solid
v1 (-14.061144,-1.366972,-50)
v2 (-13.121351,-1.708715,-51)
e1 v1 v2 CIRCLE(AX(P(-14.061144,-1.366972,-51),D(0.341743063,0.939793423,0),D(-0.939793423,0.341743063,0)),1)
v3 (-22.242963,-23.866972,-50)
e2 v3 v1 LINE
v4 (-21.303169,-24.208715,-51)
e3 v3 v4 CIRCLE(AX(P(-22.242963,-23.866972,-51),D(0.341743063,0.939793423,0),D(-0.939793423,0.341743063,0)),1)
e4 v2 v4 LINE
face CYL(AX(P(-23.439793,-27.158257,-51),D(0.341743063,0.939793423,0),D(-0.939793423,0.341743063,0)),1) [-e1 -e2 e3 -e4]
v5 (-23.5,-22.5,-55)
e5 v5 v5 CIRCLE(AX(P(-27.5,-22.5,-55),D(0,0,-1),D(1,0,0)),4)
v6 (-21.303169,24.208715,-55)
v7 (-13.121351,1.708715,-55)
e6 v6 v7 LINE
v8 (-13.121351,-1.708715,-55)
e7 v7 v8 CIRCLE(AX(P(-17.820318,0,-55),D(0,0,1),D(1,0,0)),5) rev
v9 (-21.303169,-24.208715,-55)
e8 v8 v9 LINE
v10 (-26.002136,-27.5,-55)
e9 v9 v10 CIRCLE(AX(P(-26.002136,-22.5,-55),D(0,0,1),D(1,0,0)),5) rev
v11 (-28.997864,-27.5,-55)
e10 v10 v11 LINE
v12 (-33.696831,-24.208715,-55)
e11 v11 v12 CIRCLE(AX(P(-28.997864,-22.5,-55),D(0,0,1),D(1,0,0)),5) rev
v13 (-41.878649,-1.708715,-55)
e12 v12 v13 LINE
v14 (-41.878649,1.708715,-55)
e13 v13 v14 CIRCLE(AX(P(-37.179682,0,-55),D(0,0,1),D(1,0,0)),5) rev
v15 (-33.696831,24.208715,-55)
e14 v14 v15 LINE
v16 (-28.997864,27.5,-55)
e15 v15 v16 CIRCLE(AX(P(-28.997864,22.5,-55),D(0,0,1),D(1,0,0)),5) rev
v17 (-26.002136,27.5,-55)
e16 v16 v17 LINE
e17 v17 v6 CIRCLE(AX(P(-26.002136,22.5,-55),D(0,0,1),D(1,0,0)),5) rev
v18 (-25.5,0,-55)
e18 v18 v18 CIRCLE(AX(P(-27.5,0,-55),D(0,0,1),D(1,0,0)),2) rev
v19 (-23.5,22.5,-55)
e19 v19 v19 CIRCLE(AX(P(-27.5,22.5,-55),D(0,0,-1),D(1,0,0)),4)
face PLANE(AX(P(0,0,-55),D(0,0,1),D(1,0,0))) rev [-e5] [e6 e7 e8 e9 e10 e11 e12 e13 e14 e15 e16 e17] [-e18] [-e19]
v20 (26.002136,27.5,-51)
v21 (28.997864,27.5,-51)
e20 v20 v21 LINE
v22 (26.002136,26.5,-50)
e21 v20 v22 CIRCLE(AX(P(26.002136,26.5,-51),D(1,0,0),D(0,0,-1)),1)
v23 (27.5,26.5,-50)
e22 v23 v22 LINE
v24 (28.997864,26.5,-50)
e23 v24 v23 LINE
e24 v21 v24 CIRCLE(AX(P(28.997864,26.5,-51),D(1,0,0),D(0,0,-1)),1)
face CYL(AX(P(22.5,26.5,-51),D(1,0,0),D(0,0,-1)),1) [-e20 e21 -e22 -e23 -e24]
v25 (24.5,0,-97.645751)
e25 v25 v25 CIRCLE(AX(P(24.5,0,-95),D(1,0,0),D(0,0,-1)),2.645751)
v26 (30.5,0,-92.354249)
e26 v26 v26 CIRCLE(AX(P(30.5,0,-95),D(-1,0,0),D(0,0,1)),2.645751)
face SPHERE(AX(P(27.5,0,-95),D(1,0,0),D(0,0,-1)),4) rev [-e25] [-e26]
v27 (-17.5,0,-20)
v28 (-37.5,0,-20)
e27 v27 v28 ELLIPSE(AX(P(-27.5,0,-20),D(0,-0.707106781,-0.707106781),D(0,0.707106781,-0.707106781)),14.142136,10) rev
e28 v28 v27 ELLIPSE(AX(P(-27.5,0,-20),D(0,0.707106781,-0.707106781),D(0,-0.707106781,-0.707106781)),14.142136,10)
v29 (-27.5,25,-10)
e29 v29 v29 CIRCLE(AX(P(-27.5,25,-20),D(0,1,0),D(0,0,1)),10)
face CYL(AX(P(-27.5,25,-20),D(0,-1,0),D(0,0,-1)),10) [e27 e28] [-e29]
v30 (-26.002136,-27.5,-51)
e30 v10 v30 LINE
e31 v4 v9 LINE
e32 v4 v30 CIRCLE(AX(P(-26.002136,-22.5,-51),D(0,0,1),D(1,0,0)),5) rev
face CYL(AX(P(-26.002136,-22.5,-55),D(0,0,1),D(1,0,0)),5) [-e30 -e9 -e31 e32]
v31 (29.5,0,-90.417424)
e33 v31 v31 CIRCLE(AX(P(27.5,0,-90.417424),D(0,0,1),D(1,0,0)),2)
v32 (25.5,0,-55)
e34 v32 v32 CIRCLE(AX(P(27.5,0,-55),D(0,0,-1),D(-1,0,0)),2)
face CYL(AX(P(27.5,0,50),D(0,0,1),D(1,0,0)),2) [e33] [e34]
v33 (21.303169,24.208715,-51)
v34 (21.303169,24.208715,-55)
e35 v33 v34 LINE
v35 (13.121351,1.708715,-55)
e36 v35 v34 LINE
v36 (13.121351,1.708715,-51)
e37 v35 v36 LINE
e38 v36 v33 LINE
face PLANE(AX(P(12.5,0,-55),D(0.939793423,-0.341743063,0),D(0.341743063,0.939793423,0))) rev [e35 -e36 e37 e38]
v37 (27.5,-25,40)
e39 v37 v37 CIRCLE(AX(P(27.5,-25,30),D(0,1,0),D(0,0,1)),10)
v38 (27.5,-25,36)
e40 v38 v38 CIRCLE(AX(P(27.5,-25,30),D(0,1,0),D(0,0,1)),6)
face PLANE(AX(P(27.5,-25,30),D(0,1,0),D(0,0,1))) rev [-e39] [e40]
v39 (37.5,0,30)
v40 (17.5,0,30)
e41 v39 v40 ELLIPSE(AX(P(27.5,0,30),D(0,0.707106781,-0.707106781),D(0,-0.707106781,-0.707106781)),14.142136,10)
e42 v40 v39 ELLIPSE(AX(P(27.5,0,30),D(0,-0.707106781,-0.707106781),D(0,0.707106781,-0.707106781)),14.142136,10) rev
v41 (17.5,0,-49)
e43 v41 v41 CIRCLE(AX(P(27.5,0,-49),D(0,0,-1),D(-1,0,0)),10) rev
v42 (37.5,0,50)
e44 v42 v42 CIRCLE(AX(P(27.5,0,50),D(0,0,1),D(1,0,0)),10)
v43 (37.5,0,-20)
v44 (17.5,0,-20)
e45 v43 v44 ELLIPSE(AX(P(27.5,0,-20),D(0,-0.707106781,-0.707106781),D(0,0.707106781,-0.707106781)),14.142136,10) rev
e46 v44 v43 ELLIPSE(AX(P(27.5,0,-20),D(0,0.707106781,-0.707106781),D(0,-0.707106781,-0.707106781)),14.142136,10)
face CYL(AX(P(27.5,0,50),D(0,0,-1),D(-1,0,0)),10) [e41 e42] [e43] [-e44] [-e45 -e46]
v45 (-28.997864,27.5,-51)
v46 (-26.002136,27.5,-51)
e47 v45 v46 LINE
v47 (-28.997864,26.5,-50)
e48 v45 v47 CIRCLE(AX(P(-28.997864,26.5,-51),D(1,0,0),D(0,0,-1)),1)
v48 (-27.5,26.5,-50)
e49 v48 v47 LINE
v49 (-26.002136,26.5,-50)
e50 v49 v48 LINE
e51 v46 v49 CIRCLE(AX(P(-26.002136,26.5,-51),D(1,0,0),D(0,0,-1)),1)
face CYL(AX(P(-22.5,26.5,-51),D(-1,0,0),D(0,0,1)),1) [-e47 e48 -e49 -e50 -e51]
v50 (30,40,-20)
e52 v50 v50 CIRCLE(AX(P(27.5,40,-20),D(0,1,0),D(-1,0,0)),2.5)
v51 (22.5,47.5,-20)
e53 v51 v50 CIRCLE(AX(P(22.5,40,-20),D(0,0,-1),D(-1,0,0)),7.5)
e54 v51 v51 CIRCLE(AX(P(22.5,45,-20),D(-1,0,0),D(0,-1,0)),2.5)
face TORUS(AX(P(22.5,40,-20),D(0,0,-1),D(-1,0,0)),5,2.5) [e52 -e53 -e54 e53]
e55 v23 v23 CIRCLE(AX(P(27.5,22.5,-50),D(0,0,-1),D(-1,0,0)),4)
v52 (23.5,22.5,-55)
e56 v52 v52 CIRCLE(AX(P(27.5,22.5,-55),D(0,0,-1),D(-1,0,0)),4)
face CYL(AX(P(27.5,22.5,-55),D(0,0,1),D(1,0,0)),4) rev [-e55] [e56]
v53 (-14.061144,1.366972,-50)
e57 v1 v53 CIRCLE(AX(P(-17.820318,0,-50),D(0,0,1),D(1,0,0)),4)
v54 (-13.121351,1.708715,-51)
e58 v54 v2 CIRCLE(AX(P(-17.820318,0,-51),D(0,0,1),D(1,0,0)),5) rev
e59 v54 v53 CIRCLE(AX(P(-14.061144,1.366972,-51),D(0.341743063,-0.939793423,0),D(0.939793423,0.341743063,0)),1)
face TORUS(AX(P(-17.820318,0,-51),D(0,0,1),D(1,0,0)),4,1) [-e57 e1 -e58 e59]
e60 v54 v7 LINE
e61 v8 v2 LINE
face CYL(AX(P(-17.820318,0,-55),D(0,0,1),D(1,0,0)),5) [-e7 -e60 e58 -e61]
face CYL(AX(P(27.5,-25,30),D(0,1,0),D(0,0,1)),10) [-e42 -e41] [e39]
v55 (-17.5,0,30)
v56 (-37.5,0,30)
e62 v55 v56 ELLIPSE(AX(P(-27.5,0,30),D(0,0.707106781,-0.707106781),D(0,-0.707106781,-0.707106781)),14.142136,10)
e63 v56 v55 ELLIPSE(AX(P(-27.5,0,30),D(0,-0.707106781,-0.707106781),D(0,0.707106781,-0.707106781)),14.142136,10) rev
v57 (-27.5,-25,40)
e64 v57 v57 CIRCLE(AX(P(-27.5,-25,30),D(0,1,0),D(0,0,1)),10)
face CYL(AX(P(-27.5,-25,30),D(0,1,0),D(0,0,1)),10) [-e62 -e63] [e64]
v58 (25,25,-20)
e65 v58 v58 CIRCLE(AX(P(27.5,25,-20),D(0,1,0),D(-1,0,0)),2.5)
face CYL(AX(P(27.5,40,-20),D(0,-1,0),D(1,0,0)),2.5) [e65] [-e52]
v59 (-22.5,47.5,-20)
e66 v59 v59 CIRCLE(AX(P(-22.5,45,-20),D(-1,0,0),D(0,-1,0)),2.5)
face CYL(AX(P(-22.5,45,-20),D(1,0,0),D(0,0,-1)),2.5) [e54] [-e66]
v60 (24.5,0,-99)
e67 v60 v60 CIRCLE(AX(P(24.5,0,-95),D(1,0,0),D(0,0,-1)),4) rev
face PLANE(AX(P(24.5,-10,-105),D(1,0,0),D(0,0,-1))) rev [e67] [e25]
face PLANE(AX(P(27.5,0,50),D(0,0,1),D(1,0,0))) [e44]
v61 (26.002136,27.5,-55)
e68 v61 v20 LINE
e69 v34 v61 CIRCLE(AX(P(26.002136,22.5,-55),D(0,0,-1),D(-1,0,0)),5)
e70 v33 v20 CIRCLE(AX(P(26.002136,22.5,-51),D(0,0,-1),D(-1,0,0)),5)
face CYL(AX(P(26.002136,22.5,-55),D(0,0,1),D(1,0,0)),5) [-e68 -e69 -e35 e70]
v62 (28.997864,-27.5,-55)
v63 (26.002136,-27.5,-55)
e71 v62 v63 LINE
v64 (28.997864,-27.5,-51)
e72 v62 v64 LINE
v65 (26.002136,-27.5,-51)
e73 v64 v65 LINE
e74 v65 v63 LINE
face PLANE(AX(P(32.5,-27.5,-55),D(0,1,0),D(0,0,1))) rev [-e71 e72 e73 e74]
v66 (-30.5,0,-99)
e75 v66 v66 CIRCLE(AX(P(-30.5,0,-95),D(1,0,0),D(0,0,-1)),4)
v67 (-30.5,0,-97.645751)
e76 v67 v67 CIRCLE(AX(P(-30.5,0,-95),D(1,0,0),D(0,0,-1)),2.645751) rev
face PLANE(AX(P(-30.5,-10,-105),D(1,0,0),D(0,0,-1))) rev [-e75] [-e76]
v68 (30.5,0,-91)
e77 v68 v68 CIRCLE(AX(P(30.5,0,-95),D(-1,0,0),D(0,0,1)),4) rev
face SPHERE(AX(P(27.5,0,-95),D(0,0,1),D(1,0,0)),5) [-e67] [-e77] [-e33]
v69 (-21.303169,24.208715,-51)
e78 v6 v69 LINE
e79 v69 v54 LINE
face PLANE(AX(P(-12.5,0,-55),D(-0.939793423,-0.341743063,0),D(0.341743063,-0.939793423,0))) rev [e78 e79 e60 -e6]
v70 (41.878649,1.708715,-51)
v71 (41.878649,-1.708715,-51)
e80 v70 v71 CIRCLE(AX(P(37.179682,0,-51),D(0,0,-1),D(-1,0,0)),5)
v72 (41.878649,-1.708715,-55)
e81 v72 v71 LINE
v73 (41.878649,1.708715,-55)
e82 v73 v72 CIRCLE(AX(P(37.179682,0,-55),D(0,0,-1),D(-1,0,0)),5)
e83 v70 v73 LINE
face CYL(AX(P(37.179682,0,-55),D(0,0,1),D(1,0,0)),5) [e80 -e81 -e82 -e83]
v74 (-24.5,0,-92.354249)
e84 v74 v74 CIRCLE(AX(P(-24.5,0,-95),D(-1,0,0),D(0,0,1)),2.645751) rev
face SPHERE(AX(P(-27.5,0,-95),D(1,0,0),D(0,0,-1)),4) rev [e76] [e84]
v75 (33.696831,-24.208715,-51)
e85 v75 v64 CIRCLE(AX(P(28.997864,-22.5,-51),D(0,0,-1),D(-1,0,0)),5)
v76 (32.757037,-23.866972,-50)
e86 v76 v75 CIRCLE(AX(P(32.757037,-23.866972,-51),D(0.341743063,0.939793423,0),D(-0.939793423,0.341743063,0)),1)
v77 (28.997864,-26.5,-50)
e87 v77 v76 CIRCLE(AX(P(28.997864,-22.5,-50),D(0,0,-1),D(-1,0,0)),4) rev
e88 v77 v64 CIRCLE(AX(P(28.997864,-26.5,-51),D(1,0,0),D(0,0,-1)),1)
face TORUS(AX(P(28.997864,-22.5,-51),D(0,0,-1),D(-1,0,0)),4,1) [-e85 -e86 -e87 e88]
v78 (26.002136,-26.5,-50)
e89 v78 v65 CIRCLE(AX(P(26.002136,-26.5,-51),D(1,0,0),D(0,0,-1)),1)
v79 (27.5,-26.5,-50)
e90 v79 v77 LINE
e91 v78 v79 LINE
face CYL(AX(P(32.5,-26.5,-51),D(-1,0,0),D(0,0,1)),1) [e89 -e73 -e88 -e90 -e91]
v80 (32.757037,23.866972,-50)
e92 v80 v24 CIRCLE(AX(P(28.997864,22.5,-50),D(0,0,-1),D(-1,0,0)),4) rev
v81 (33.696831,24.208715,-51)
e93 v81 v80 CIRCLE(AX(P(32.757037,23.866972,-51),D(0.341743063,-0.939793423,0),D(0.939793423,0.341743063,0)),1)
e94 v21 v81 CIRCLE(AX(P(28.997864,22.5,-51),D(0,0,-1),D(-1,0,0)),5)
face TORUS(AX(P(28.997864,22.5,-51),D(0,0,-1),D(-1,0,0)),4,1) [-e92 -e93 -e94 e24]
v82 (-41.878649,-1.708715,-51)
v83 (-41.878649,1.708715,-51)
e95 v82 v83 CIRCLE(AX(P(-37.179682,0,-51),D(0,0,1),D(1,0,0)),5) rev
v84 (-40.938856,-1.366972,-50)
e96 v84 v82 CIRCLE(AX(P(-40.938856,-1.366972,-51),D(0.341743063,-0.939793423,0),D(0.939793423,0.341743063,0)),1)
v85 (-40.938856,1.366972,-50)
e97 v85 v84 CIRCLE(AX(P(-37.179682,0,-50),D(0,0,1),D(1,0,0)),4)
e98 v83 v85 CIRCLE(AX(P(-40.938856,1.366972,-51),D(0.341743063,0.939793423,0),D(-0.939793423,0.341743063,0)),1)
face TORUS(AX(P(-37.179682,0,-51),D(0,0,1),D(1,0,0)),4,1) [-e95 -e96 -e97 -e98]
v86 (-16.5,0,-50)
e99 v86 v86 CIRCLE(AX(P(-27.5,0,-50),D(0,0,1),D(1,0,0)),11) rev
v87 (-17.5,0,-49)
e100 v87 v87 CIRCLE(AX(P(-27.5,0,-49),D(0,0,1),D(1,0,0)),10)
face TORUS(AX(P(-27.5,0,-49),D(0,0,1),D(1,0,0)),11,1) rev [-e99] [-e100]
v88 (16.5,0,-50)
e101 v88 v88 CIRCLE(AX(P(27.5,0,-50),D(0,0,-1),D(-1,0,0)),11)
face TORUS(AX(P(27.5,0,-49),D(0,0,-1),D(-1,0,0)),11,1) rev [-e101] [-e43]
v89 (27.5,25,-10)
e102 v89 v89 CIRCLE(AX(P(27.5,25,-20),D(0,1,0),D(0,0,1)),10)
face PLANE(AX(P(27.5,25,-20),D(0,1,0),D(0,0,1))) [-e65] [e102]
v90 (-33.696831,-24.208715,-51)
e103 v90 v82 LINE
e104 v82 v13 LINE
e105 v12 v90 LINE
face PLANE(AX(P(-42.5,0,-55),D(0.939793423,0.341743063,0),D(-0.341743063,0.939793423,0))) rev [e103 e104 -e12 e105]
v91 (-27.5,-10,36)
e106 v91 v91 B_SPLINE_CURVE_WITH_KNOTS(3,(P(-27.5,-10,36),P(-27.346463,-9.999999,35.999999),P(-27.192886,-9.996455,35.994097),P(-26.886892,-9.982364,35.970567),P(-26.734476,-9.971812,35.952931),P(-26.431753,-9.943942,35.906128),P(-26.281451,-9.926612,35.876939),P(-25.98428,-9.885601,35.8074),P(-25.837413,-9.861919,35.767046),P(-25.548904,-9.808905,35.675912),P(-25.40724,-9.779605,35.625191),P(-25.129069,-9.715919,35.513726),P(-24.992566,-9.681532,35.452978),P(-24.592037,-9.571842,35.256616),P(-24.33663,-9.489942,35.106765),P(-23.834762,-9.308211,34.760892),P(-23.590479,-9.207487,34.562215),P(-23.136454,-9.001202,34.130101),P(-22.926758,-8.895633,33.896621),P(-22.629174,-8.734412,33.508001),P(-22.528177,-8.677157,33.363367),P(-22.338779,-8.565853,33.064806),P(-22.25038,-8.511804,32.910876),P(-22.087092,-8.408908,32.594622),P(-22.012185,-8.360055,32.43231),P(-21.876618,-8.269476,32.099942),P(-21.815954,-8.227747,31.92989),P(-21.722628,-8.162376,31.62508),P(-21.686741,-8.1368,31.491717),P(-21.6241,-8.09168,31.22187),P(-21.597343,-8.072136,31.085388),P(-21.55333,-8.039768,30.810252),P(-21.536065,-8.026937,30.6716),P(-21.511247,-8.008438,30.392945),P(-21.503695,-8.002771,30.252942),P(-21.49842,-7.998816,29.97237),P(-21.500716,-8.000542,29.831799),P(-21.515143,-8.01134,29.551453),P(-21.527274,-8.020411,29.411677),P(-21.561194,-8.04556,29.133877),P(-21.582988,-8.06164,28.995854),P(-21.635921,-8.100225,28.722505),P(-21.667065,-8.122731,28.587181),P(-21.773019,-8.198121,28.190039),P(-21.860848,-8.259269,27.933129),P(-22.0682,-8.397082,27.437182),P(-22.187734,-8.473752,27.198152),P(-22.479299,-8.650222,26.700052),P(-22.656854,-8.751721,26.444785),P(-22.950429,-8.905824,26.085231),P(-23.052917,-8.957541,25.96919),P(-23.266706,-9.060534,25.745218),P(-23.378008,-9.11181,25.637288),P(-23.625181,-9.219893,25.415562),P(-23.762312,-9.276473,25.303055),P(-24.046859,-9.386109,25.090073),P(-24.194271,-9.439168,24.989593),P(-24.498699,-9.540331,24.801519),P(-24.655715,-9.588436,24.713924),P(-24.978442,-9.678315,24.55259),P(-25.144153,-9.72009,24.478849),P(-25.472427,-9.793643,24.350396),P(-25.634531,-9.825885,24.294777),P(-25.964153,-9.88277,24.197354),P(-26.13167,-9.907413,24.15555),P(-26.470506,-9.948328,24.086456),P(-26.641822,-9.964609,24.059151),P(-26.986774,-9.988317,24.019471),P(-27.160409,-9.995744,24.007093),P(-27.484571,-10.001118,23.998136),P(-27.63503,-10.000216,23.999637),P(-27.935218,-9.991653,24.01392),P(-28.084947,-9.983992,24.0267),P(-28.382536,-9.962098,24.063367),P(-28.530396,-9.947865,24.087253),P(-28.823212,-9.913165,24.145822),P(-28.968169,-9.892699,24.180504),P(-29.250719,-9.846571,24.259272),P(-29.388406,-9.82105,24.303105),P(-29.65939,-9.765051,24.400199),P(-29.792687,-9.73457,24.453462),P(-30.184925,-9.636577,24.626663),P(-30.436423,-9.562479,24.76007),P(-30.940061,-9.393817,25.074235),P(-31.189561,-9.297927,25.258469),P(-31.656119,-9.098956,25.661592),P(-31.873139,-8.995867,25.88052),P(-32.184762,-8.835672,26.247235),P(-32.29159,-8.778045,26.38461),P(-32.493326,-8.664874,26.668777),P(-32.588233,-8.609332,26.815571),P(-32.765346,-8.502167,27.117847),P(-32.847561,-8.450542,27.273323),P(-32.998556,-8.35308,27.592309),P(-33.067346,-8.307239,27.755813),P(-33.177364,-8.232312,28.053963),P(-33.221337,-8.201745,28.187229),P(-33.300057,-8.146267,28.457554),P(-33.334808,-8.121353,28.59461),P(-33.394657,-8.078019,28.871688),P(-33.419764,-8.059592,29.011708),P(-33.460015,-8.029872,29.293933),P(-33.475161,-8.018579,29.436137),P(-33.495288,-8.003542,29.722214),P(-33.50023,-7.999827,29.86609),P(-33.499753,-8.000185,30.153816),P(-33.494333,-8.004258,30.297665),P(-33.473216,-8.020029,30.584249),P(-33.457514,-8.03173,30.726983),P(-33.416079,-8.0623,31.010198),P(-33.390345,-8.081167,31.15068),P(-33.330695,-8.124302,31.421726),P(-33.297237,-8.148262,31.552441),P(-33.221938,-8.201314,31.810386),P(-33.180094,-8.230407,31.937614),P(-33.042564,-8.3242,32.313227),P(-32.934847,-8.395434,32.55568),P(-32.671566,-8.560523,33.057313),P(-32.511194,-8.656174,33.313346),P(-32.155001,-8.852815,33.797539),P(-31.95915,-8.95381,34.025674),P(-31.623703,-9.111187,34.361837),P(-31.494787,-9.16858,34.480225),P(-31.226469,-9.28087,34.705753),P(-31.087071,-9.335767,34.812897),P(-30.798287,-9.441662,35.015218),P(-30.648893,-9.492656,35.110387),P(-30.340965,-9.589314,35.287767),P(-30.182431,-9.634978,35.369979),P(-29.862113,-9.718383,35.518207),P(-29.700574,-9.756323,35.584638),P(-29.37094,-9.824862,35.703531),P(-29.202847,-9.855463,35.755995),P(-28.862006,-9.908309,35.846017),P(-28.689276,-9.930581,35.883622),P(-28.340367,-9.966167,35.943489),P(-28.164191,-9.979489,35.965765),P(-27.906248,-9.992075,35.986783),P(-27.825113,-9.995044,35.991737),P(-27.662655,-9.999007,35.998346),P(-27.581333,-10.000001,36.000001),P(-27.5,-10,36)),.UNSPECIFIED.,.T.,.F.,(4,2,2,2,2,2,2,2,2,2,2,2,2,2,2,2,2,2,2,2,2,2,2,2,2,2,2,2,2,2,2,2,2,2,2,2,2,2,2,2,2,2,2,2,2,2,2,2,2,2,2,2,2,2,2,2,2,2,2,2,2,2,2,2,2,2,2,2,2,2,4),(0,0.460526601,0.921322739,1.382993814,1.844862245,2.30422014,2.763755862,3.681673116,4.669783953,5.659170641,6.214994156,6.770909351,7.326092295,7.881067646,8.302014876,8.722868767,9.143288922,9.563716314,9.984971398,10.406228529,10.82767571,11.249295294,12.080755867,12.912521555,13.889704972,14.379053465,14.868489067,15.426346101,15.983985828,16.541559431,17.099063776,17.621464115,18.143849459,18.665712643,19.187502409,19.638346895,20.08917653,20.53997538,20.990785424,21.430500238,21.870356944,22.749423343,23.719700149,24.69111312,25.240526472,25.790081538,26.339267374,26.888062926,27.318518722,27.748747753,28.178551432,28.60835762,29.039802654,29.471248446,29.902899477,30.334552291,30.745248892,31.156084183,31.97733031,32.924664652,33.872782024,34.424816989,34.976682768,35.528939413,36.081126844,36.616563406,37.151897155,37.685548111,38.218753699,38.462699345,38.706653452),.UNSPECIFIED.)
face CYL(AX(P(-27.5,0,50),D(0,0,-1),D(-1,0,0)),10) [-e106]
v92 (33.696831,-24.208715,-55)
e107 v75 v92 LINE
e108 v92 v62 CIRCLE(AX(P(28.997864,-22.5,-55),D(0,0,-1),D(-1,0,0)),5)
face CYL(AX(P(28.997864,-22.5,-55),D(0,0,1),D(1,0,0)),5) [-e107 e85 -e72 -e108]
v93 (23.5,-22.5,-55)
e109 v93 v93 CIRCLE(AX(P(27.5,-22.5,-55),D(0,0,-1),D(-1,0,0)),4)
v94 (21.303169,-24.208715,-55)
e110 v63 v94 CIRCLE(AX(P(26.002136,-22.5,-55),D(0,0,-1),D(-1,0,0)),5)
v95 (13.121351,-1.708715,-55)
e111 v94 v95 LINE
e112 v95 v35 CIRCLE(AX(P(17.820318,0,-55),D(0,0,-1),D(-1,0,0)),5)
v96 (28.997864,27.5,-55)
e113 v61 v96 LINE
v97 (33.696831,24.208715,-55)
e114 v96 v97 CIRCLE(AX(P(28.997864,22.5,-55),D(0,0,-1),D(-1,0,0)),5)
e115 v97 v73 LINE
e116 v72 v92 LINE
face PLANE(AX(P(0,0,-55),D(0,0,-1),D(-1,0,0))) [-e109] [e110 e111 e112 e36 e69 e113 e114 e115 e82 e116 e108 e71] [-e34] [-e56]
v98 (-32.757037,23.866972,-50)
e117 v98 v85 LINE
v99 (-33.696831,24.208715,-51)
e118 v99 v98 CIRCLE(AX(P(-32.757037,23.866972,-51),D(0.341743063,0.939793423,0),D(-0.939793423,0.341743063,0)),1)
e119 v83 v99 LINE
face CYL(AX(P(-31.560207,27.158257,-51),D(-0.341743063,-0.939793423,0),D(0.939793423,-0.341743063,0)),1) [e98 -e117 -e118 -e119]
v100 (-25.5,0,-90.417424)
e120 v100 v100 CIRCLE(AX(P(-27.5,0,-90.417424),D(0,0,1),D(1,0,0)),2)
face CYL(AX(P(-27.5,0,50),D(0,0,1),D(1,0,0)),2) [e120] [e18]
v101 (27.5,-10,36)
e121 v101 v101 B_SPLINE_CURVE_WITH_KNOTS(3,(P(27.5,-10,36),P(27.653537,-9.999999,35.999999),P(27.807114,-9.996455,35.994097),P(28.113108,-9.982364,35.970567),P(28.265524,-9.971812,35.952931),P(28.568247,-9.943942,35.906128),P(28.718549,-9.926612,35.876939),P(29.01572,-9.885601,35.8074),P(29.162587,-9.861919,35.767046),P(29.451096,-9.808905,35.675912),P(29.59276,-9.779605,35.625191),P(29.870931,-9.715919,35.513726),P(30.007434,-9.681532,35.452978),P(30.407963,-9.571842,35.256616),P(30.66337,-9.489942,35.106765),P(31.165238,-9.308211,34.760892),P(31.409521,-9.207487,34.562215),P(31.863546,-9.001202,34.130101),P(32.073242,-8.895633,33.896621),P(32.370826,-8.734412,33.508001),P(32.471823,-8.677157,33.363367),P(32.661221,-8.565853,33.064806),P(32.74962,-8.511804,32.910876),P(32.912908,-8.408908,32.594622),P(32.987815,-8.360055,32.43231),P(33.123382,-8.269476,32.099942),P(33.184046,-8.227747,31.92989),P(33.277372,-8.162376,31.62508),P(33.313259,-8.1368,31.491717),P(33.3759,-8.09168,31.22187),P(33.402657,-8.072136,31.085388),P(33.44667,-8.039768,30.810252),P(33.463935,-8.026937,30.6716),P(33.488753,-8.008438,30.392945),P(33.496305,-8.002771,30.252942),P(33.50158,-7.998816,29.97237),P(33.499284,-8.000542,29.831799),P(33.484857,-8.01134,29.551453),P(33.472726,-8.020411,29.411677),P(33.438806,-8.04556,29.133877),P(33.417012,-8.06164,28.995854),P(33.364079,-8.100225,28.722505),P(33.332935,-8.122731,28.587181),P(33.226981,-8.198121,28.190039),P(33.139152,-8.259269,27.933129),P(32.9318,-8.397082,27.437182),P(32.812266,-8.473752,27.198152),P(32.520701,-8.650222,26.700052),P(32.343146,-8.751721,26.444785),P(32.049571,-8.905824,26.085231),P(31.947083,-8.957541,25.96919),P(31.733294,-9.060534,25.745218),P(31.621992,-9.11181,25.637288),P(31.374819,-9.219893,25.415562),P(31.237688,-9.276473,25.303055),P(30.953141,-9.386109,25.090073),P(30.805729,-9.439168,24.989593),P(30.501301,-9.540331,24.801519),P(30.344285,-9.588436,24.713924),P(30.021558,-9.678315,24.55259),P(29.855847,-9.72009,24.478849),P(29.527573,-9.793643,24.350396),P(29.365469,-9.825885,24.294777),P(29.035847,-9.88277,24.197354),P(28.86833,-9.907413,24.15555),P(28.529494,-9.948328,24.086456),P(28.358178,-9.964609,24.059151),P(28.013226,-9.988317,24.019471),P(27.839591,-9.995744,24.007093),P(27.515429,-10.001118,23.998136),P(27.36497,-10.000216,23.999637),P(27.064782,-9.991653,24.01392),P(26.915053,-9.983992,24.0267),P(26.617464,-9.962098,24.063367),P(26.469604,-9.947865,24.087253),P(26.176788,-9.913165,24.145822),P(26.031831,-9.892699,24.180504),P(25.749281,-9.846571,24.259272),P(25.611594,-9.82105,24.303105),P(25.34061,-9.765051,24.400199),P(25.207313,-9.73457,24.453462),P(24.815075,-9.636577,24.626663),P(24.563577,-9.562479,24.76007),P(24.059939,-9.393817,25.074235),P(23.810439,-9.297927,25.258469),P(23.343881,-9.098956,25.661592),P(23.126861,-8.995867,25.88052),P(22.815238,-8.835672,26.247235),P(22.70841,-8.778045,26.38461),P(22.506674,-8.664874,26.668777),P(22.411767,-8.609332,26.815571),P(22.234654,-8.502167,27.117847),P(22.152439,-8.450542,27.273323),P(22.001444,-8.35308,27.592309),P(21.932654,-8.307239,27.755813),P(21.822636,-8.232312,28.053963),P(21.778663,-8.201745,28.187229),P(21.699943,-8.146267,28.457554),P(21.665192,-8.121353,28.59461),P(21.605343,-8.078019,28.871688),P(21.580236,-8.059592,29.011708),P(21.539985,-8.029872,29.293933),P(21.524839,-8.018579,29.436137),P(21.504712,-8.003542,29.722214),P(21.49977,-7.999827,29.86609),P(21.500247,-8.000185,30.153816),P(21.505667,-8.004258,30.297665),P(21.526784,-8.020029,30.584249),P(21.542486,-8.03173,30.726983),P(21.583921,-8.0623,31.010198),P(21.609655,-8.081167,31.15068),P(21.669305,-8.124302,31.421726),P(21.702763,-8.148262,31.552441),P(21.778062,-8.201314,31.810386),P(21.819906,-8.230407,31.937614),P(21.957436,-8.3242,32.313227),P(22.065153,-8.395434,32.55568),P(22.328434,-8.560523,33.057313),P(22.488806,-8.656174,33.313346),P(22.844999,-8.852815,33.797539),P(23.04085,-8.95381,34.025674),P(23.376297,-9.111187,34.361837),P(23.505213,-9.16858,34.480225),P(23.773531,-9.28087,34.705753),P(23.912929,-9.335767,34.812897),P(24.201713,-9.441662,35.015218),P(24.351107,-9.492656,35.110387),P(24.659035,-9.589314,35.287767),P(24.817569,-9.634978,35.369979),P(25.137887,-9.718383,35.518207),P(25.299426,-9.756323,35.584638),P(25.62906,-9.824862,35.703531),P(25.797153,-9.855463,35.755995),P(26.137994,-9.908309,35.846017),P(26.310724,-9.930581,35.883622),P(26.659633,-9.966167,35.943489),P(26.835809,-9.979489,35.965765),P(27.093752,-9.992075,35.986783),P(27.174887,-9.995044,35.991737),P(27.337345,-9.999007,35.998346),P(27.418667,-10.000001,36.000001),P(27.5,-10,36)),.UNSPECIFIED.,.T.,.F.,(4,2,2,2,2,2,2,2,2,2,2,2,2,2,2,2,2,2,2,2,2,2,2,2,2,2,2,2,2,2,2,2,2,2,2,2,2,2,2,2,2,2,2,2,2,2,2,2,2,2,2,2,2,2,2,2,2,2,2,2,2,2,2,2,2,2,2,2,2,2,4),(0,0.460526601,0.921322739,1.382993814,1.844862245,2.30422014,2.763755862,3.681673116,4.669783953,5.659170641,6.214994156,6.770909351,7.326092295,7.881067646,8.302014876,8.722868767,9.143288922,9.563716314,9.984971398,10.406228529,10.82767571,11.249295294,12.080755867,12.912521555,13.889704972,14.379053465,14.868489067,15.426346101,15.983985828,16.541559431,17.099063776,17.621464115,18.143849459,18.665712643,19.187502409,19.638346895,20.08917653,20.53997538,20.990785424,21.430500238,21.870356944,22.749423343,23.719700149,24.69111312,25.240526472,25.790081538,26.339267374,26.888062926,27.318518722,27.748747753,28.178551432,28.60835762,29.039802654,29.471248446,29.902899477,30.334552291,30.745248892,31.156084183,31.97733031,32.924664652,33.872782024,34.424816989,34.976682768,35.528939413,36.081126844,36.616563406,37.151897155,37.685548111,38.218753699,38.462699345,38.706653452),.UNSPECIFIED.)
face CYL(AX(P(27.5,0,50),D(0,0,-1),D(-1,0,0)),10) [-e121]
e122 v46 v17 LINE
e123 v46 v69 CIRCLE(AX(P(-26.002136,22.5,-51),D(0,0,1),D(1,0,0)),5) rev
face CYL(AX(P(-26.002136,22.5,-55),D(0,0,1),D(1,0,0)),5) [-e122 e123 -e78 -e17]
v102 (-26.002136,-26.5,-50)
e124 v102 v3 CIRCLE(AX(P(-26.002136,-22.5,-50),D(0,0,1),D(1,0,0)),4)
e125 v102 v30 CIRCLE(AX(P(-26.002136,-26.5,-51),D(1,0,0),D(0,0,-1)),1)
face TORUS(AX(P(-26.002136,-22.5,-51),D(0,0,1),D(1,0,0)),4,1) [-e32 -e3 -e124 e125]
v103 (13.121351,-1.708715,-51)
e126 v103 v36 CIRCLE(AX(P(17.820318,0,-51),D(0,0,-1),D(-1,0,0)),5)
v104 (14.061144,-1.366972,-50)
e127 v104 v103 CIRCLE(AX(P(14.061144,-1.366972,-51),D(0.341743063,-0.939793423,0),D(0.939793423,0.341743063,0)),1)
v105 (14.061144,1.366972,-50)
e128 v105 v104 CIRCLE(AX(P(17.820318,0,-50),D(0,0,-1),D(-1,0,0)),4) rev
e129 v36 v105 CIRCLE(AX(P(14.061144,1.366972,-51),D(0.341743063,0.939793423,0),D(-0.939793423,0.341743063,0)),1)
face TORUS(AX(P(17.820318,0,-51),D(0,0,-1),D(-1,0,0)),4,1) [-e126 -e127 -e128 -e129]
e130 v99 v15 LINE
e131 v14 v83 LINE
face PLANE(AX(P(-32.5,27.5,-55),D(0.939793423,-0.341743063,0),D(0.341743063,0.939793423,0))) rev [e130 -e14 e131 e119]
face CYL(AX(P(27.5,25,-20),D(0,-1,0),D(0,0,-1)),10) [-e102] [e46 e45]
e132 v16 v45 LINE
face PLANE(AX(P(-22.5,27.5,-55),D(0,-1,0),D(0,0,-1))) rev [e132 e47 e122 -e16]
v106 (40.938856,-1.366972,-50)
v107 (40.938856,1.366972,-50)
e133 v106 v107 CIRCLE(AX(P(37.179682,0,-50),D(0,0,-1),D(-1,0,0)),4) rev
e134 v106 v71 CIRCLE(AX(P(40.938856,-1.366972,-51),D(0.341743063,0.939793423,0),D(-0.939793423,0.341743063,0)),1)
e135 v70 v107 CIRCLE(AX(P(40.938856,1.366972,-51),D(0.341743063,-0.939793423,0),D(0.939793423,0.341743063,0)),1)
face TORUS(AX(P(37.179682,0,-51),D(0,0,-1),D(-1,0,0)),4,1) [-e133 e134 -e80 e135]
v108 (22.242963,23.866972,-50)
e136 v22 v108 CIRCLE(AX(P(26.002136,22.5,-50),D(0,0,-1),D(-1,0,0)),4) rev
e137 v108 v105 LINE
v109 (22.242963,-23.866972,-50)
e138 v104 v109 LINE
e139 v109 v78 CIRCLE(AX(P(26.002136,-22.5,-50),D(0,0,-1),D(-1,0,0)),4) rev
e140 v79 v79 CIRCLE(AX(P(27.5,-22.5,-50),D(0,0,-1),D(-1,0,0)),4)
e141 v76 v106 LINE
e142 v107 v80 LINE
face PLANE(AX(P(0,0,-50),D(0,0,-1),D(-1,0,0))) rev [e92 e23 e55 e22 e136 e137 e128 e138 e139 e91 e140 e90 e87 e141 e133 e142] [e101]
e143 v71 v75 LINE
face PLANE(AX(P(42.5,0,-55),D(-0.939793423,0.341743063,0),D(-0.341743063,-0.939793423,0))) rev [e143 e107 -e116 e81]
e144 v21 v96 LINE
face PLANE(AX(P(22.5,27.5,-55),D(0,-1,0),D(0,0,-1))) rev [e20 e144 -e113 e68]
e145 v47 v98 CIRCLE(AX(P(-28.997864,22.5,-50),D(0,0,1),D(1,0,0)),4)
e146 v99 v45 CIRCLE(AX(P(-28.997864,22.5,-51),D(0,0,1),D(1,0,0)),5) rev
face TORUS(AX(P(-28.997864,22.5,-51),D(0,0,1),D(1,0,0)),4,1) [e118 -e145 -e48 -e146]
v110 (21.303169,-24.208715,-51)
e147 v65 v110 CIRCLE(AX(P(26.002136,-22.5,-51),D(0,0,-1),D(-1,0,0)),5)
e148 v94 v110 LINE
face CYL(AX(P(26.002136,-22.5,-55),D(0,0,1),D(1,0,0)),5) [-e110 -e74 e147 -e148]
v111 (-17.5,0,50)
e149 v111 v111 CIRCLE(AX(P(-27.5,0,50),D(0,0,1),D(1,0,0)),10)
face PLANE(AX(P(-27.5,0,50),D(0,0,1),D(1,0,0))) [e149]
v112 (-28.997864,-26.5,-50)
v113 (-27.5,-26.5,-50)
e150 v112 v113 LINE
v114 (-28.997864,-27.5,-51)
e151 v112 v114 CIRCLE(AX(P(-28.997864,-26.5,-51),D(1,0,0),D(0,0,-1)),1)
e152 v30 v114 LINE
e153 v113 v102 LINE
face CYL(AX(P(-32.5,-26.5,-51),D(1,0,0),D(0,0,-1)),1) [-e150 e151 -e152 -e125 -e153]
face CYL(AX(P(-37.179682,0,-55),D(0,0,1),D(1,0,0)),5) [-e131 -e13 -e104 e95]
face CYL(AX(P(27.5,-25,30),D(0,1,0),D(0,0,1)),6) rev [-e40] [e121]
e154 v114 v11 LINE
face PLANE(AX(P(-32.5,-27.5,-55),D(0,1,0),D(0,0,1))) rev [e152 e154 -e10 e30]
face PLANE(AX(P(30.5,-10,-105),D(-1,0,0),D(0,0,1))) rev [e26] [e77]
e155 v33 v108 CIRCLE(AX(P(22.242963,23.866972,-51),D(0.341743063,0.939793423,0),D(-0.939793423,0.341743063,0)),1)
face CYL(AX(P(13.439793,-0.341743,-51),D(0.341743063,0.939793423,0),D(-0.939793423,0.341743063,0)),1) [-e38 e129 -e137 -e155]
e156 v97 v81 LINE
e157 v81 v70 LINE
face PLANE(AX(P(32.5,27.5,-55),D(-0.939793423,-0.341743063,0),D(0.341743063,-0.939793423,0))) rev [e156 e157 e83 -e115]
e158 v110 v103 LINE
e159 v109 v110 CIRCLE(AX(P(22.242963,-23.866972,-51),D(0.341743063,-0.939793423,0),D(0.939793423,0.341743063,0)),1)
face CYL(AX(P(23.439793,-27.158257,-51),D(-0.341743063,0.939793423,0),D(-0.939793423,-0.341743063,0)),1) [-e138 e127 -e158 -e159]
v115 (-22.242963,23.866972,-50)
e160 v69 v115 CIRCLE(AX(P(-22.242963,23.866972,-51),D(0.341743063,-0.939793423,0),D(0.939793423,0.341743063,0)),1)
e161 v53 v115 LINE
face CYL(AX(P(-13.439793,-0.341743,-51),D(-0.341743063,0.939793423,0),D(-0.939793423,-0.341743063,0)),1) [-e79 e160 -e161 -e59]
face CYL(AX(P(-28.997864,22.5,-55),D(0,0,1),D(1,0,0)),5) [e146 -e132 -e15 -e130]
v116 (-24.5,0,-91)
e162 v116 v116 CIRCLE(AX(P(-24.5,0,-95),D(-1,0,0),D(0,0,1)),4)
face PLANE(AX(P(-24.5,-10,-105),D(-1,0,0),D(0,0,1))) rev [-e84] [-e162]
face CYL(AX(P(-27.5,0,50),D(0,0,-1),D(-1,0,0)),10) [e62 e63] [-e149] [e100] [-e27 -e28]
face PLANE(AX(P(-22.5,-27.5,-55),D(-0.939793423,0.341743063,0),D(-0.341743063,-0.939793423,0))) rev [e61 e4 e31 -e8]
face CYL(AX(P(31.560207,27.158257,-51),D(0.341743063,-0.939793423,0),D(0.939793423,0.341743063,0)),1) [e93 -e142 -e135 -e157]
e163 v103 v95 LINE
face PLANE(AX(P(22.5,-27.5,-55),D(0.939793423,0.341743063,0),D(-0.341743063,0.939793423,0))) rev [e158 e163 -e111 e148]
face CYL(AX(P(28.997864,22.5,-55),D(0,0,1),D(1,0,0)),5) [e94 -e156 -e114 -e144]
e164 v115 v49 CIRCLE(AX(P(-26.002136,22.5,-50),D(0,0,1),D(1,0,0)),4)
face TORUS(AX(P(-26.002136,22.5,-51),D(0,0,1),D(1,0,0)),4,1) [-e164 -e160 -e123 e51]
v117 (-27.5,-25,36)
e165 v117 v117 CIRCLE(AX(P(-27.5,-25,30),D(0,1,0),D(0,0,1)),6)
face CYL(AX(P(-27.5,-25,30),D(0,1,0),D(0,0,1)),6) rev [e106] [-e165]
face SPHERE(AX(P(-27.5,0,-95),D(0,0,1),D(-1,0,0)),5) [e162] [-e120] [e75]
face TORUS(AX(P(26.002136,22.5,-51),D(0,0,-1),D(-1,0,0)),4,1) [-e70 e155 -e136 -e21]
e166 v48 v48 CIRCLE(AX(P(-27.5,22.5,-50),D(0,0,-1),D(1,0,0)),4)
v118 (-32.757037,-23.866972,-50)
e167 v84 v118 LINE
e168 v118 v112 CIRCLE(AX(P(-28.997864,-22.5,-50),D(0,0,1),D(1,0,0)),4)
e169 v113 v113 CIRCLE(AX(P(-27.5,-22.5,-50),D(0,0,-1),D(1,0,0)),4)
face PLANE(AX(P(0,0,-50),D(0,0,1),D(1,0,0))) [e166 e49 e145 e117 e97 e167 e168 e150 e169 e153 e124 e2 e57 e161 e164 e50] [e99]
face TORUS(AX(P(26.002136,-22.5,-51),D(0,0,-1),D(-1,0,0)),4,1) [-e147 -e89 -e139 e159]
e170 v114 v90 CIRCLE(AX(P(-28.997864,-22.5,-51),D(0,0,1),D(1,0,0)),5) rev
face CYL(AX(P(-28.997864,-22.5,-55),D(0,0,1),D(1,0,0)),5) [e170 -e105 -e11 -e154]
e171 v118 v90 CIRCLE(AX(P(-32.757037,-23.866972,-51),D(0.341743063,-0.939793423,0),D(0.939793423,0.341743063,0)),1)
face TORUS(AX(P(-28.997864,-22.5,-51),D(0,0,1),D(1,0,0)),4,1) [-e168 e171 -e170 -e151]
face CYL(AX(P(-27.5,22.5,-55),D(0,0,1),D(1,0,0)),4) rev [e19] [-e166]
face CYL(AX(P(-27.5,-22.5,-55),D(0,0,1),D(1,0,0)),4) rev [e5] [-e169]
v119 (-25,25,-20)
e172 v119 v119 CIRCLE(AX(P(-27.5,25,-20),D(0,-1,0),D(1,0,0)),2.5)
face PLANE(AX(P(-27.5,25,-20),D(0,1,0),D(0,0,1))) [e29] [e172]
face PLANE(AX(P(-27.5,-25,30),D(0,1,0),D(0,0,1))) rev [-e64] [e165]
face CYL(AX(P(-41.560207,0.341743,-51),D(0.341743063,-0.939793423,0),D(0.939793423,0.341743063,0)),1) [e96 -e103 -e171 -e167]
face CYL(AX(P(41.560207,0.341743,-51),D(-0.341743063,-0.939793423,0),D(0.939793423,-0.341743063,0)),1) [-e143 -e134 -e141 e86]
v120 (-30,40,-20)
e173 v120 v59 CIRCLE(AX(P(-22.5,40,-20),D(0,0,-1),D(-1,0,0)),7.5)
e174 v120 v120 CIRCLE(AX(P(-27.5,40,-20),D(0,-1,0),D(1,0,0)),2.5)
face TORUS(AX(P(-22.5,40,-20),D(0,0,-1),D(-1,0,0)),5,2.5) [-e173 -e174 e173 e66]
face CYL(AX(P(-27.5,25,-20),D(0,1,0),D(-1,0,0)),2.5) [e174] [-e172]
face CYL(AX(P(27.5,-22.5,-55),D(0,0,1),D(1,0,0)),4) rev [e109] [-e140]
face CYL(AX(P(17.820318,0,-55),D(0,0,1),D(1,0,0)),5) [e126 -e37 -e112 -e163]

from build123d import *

# Parameters (mm, degrees)
SZKIC1_R                          = 10
DODANIE_WYCI_GNI_CIE1_DEPTH       = 50
DODANIE_WYCI_GNI_CIE1_2_DEPTH     = 50
SZKIC2_R                          = 4
DODANIE_WYCI_GNI_CIE2_DEPTH       = 5
ZAOKR_GLENIE1_R                   = 5
ZAOKR_GLENIE2_R                   = 5
ZAOKR_GLENIE3_R                   = 1
ZAOKR_GLENIE4_R                   = 1
SZKIC5_W                          = 12
SZKIC5_H                          = 25
SZKIC5_W_2                        = 6
SZKIC5_H_2                        = 20
WYTNIJ_WYCI_GNI_CIE1_DEPTH        = 50
SZKIC6_R                          = 10
DODANIE_WYCI_GNI_CIE3_DEPTH       = 25
WYCI_GNI_CIE_PO_CIE_CE1_PROFILE_R = 2.5
SZKIC19_R                         = 10
SZKIC19_R_2                       = 6
DODANIE_WYCI_GNI_CIE4_DEPTH       = 25


with BuildPart() as part:
    # Szkic1 → Dodanie-wyciągnięcie1 (new, symmetric)
    with BuildSketch(Plane.XY):
        with Locations((-27.5, 0)):
            Circle(SZKIC1_R)
    extrude(amount=DODANIE_WYCI_GNI_CIE1_DEPTH, both=True)



with BuildPart() as body_2:
    # Szkic1 → Dodanie-wyci_gni_cie1 2 (new, symmetric)
    with BuildSketch(Plane.XY):
        with Locations((27.5, 0)):
            Circle(SZKIC1_R)
    extrude(amount=DODANIE_WYCI_GNI_CIE1_2_DEPTH, both=True)


with BuildPart() as part_1:
    add(part.part)

    add(body_2.part)  # Dodanie-wyciągnięcie2 merges body 2
    # Szkic2 → Dodanie-wyciągnięcie2 (add)
    # profile 1 of 2: a face of its own
    with BuildSketch(Plane(origin=(0, 0, -50), x_dir=(-1, 0, 0), z_dir=(0, 0, -1))):
        Polygon((-22.5, 27.5), (-32.5, 27.5), (-42.5, 0), (-32.5, -27.5), (-22.5, -27.5), (-12.5, 0), align=None)
        with Locations((-27.5, 22.5)):
            Circle(SZKIC2_R, mode=Mode.SUBTRACT)
        with Locations((-27.5, -22.5)):
            Circle(SZKIC2_R, mode=Mode.SUBTRACT)
    # profile 2 of 2: a face of its own
    with BuildSketch(Plane(origin=(0, 0, -50), x_dir=(-1, 0, 0), z_dir=(0, 0, -1))):
        Polygon((12.5, 0), (22.5, 27.5), (32.5, 27.5), (42.5, 0), (32.5, -27.5), (22.5, -27.5), align=None)
        with Locations(Location((27.5, -22.5, 0), (0, 0, 180))):
            Circle(SZKIC2_R, mode=Mode.SUBTRACT)
        with Locations(Location((27.5, 22.5, 0), (0, 0, 180))):
            Circle(SZKIC2_R, mode=Mode.SUBTRACT)
    extrude(amount=DODANIE_WYCI_GNI_CIE2_DEPTH)

    # Zaokrąglenie1
    zaokr_glenie1_edges = [part_1.edges().sort_by_distance(p)[0] for p in [
        (-22.5, 27.5, -52.5),
        (-12.5, 0, -52.5),
        (-22.5, -27.5, -52.5),
        (-32.5, -27.5, -52.5),
        (-42.5, 0, -52.5),
        (-32.5, 27.5, -52.5),
    ]]
    fillet(zaokr_glenie1_edges, radius=ZAOKR_GLENIE1_R)

    # Zaokrąglenie2
    zaokr_glenie2_edges = [part_1.edges().sort_by_distance(p)[0] for p in [
        (22.5, -27.5, -52.5),
        (12.5, 0, -52.5),
        (22.5, 27.5, -52.5),
        (32.5, 27.5, -52.5),
        (42.5, 0, -52.5),
        (32.5, -27.5, -52.5),
    ]]
    fillet(zaokr_glenie2_edges, radius=ZAOKR_GLENIE2_R)

    # Zaokrąglenie3
    zaokr_glenie3_edges = [part_1.edges().sort_by_distance(p)[0] for p in [
        (-17.212260115, 12.958715315, -50),
        (-17.212260115, -12.958715315, -50),
        (-27.5, 27.5, -50),
        (-37.787739885, 12.958715315, -50),
        (-37.787739885, -12.958715315, -50),
        (-27.5, -27.5, -50),
        (-31.866349638, 26.595337384, -50),
        (-42.179681859, 0, -50),
        (-31.866349638, -26.595337384, -50),
        (-23.133650362, -26.595337384, -50),
        (-12.820318141, 0, -50),
        (-23.133650362, 26.595337384, -50),
        (-37.5, 0, -50),
    ]]
    fillet(zaokr_glenie3_edges, radius=ZAOKR_GLENIE3_R - 0.0001)  # a hair under: the kernel refuses the full size

    # Zaokrąglenie4
    zaokr_glenie4_edges = [part_1.edges().sort_by_distance(p)[0] for p in [
        (17.212260115, 12.958715315, -50),
        (17.212260115, -12.958715315, -50),
        (27.5, -27.5, -50),
        (37.787739885, -12.958715315, -50),
        (37.787739885, 12.958715315, -50),
        (27.5, 27.5, -50),
        (23.133650362, 26.595337384, -50),
        (31.866349638, 26.595337384, -50),
        (42.179681859, 0, -50),
        (31.866349638, -26.595337384, -50),
        (23.133650362, -26.595337384, -50),
        (12.820318141, 0, -50),
        (17.5, 0, -50),
    ]]
    fillet(zaokr_glenie4_edges, radius=ZAOKR_GLENIE4_R - 0.0001)  # a hair under: the kernel refuses the full size

    # Szkic3 → Obrót1 (revolve)
    with BuildSketch(Plane(origin=(0, 0, 0), x_dir=(1, 0, 0), z_dir=(0, 1, 0))):
        with BuildLine():
            Line((27.5, 55), (29.5, 55))
            Line((29.5, 55), (29.5, 90.417424305))
            ThreePointArc((29.5, 90.417424305), (32.394531565, 96.021548218), (27.5, 100))
            Line((27.5, 100), (27.5, 99))
            ThreePointArc((27.5, 99), (31.5, 95), (27.5, 91))
            Line((27.5, 91), (27.5, 55))
        make_face()
    revolve(axis=Axis((27.5, 0, 50), (0, 0, -1)))

    # Szkic4 → Obrót2 (revolve)
    with BuildSketch(Plane(origin=(0, 0, 0), x_dir=(1, 0, 0), z_dir=(0, 1, 0)), mode=Mode.PRIVATE) as obr_t2_sk:
        with BuildLine():
            Line((-27.5, 55), (-29.5, 55))
            Line((-29.5, 55), (-29.5, 90.417424305))
            ThreePointArc((-29.5, 90.417424305), (-32.394531565, 96.021548218), (-27.5, 100))
            Line((-27.5, 100), (-27.5, 99))
            ThreePointArc((-27.5, 99), (-31.5, 95), (-27.5, 91))
            Line((-27.5, 91), (-27.5, 55))
        make_face()
    revolve(obr_t2_sk.sketch.rotate(Axis((-27.5, 0, 50), (0, 0, -1)), 180), axis=Axis((-27.5, 0, 50), (0, 0, -1)))

    # Szkic5 → Wytnij-wyciągnięcie1 (cut)
    # profile 1 of 2: a face of its own
    with BuildSketch(Plane(origin=(0, 0, -55), x_dir=(-1, 0, 0), z_dir=(0, 0, -1))):
        with Locations((-27.5, 0)):
            Rectangle(SZKIC5_W, SZKIC5_H)
        with Locations((-27.5, 0)):
            Rectangle(SZKIC5_W_2, SZKIC5_H_2, mode=Mode.SUBTRACT)
    # profile 2 of 2: a face of its own
    with BuildSketch(Plane(origin=(0, 0, -55), x_dir=(-1, 0, 0), z_dir=(0, 0, -1))):
        with Locations((27.5, 0)):
            Rectangle(SZKIC5_W, SZKIC5_H)
        with Locations((27.5, 0)):
            Rectangle(SZKIC5_W_2, SZKIC5_H_2, mode=Mode.SUBTRACT)
    extrude(amount=WYTNIJ_WYCI_GNI_CIE1_DEPTH, mode=Mode.SUBTRACT)

    # Szkic6 → Dodanie-wyciągnięcie3 (add)
    with BuildSketch(Plane(origin=(0, 0, 0), x_dir=(1, 0, 0), z_dir=(0, 1, 0))):
        with Locations((-27.5, 20)):
            Circle(SZKIC6_R)
        with Locations((27.5, 20)):
            Circle(SZKIC6_R)
    extrude(amount=DODANIE_WYCI_GNI_CIE3_DEPTH)

    # Wyciągnięcie po ścieżce1: sweep along a path in Szkic7
    with BuildLine(Plane.XY.offset(-20)) as wyci_gni_cie_po_cie_ce1_path:
        Line((-27.5, 25), (-27.5, 40))
        ThreePointArc((-27.5, 40), (-26.035533906, 43.535533906), (-22.5, 45))
        Line((-22.5, 45), (22.5, 45))
        ThreePointArc((22.5, 45), (26.035533906, 43.535533906), (27.5, 40))
        Line((27.5, 40), (27.5, 25))
    # Wyciągnięcie po ścieżce1 profile (on start of the path) → Wyciągnięcie po ścieżce1 (sweep)
    with BuildSketch(Plane(origin=(-27.5, 25, -20), x_dir=(1, 0, 0), z_dir=(0, 1, 0))):
        Circle(WYCI_GNI_CIE_PO_CIE_CE1_PROFILE_R)
    sweep(path=wyci_gni_cie_po_cie_ce1_path.line)

    # Szkic19 → Dodanie-wyciągnięcie4 (add)
    # profile 1 of 2: a face of its own
    with BuildSketch(Plane(origin=(0, 0, 0), x_dir=(1, 0, 0), z_dir=(0, 1, 0))):
        with Locations(Location((27.5, -30, 0), (0, 0, 270))):
            Circle(SZKIC19_R)
        with Locations(Location((27.5, -30, 0), (0, 0, 270))):
            Circle(SZKIC19_R_2, mode=Mode.SUBTRACT)
    # profile 2 of 2: a face of its own
    with BuildSketch(Plane(origin=(0, 0, 0), x_dir=(1, 0, 0), z_dir=(0, 1, 0))):
        with Locations(Location((-27.5, -30, 0), (0, 0, 270))):
            Circle(SZKIC19_R)
        with Locations(Location((-27.5, -30, 0), (0, 0, 270))):
            Circle(SZKIC19_R_2, mode=Mode.SUBTRACT)
    extrude(amount=-DODANIE_WYCI_GNI_CIE4_DEPTH)


solid = part_1.part
